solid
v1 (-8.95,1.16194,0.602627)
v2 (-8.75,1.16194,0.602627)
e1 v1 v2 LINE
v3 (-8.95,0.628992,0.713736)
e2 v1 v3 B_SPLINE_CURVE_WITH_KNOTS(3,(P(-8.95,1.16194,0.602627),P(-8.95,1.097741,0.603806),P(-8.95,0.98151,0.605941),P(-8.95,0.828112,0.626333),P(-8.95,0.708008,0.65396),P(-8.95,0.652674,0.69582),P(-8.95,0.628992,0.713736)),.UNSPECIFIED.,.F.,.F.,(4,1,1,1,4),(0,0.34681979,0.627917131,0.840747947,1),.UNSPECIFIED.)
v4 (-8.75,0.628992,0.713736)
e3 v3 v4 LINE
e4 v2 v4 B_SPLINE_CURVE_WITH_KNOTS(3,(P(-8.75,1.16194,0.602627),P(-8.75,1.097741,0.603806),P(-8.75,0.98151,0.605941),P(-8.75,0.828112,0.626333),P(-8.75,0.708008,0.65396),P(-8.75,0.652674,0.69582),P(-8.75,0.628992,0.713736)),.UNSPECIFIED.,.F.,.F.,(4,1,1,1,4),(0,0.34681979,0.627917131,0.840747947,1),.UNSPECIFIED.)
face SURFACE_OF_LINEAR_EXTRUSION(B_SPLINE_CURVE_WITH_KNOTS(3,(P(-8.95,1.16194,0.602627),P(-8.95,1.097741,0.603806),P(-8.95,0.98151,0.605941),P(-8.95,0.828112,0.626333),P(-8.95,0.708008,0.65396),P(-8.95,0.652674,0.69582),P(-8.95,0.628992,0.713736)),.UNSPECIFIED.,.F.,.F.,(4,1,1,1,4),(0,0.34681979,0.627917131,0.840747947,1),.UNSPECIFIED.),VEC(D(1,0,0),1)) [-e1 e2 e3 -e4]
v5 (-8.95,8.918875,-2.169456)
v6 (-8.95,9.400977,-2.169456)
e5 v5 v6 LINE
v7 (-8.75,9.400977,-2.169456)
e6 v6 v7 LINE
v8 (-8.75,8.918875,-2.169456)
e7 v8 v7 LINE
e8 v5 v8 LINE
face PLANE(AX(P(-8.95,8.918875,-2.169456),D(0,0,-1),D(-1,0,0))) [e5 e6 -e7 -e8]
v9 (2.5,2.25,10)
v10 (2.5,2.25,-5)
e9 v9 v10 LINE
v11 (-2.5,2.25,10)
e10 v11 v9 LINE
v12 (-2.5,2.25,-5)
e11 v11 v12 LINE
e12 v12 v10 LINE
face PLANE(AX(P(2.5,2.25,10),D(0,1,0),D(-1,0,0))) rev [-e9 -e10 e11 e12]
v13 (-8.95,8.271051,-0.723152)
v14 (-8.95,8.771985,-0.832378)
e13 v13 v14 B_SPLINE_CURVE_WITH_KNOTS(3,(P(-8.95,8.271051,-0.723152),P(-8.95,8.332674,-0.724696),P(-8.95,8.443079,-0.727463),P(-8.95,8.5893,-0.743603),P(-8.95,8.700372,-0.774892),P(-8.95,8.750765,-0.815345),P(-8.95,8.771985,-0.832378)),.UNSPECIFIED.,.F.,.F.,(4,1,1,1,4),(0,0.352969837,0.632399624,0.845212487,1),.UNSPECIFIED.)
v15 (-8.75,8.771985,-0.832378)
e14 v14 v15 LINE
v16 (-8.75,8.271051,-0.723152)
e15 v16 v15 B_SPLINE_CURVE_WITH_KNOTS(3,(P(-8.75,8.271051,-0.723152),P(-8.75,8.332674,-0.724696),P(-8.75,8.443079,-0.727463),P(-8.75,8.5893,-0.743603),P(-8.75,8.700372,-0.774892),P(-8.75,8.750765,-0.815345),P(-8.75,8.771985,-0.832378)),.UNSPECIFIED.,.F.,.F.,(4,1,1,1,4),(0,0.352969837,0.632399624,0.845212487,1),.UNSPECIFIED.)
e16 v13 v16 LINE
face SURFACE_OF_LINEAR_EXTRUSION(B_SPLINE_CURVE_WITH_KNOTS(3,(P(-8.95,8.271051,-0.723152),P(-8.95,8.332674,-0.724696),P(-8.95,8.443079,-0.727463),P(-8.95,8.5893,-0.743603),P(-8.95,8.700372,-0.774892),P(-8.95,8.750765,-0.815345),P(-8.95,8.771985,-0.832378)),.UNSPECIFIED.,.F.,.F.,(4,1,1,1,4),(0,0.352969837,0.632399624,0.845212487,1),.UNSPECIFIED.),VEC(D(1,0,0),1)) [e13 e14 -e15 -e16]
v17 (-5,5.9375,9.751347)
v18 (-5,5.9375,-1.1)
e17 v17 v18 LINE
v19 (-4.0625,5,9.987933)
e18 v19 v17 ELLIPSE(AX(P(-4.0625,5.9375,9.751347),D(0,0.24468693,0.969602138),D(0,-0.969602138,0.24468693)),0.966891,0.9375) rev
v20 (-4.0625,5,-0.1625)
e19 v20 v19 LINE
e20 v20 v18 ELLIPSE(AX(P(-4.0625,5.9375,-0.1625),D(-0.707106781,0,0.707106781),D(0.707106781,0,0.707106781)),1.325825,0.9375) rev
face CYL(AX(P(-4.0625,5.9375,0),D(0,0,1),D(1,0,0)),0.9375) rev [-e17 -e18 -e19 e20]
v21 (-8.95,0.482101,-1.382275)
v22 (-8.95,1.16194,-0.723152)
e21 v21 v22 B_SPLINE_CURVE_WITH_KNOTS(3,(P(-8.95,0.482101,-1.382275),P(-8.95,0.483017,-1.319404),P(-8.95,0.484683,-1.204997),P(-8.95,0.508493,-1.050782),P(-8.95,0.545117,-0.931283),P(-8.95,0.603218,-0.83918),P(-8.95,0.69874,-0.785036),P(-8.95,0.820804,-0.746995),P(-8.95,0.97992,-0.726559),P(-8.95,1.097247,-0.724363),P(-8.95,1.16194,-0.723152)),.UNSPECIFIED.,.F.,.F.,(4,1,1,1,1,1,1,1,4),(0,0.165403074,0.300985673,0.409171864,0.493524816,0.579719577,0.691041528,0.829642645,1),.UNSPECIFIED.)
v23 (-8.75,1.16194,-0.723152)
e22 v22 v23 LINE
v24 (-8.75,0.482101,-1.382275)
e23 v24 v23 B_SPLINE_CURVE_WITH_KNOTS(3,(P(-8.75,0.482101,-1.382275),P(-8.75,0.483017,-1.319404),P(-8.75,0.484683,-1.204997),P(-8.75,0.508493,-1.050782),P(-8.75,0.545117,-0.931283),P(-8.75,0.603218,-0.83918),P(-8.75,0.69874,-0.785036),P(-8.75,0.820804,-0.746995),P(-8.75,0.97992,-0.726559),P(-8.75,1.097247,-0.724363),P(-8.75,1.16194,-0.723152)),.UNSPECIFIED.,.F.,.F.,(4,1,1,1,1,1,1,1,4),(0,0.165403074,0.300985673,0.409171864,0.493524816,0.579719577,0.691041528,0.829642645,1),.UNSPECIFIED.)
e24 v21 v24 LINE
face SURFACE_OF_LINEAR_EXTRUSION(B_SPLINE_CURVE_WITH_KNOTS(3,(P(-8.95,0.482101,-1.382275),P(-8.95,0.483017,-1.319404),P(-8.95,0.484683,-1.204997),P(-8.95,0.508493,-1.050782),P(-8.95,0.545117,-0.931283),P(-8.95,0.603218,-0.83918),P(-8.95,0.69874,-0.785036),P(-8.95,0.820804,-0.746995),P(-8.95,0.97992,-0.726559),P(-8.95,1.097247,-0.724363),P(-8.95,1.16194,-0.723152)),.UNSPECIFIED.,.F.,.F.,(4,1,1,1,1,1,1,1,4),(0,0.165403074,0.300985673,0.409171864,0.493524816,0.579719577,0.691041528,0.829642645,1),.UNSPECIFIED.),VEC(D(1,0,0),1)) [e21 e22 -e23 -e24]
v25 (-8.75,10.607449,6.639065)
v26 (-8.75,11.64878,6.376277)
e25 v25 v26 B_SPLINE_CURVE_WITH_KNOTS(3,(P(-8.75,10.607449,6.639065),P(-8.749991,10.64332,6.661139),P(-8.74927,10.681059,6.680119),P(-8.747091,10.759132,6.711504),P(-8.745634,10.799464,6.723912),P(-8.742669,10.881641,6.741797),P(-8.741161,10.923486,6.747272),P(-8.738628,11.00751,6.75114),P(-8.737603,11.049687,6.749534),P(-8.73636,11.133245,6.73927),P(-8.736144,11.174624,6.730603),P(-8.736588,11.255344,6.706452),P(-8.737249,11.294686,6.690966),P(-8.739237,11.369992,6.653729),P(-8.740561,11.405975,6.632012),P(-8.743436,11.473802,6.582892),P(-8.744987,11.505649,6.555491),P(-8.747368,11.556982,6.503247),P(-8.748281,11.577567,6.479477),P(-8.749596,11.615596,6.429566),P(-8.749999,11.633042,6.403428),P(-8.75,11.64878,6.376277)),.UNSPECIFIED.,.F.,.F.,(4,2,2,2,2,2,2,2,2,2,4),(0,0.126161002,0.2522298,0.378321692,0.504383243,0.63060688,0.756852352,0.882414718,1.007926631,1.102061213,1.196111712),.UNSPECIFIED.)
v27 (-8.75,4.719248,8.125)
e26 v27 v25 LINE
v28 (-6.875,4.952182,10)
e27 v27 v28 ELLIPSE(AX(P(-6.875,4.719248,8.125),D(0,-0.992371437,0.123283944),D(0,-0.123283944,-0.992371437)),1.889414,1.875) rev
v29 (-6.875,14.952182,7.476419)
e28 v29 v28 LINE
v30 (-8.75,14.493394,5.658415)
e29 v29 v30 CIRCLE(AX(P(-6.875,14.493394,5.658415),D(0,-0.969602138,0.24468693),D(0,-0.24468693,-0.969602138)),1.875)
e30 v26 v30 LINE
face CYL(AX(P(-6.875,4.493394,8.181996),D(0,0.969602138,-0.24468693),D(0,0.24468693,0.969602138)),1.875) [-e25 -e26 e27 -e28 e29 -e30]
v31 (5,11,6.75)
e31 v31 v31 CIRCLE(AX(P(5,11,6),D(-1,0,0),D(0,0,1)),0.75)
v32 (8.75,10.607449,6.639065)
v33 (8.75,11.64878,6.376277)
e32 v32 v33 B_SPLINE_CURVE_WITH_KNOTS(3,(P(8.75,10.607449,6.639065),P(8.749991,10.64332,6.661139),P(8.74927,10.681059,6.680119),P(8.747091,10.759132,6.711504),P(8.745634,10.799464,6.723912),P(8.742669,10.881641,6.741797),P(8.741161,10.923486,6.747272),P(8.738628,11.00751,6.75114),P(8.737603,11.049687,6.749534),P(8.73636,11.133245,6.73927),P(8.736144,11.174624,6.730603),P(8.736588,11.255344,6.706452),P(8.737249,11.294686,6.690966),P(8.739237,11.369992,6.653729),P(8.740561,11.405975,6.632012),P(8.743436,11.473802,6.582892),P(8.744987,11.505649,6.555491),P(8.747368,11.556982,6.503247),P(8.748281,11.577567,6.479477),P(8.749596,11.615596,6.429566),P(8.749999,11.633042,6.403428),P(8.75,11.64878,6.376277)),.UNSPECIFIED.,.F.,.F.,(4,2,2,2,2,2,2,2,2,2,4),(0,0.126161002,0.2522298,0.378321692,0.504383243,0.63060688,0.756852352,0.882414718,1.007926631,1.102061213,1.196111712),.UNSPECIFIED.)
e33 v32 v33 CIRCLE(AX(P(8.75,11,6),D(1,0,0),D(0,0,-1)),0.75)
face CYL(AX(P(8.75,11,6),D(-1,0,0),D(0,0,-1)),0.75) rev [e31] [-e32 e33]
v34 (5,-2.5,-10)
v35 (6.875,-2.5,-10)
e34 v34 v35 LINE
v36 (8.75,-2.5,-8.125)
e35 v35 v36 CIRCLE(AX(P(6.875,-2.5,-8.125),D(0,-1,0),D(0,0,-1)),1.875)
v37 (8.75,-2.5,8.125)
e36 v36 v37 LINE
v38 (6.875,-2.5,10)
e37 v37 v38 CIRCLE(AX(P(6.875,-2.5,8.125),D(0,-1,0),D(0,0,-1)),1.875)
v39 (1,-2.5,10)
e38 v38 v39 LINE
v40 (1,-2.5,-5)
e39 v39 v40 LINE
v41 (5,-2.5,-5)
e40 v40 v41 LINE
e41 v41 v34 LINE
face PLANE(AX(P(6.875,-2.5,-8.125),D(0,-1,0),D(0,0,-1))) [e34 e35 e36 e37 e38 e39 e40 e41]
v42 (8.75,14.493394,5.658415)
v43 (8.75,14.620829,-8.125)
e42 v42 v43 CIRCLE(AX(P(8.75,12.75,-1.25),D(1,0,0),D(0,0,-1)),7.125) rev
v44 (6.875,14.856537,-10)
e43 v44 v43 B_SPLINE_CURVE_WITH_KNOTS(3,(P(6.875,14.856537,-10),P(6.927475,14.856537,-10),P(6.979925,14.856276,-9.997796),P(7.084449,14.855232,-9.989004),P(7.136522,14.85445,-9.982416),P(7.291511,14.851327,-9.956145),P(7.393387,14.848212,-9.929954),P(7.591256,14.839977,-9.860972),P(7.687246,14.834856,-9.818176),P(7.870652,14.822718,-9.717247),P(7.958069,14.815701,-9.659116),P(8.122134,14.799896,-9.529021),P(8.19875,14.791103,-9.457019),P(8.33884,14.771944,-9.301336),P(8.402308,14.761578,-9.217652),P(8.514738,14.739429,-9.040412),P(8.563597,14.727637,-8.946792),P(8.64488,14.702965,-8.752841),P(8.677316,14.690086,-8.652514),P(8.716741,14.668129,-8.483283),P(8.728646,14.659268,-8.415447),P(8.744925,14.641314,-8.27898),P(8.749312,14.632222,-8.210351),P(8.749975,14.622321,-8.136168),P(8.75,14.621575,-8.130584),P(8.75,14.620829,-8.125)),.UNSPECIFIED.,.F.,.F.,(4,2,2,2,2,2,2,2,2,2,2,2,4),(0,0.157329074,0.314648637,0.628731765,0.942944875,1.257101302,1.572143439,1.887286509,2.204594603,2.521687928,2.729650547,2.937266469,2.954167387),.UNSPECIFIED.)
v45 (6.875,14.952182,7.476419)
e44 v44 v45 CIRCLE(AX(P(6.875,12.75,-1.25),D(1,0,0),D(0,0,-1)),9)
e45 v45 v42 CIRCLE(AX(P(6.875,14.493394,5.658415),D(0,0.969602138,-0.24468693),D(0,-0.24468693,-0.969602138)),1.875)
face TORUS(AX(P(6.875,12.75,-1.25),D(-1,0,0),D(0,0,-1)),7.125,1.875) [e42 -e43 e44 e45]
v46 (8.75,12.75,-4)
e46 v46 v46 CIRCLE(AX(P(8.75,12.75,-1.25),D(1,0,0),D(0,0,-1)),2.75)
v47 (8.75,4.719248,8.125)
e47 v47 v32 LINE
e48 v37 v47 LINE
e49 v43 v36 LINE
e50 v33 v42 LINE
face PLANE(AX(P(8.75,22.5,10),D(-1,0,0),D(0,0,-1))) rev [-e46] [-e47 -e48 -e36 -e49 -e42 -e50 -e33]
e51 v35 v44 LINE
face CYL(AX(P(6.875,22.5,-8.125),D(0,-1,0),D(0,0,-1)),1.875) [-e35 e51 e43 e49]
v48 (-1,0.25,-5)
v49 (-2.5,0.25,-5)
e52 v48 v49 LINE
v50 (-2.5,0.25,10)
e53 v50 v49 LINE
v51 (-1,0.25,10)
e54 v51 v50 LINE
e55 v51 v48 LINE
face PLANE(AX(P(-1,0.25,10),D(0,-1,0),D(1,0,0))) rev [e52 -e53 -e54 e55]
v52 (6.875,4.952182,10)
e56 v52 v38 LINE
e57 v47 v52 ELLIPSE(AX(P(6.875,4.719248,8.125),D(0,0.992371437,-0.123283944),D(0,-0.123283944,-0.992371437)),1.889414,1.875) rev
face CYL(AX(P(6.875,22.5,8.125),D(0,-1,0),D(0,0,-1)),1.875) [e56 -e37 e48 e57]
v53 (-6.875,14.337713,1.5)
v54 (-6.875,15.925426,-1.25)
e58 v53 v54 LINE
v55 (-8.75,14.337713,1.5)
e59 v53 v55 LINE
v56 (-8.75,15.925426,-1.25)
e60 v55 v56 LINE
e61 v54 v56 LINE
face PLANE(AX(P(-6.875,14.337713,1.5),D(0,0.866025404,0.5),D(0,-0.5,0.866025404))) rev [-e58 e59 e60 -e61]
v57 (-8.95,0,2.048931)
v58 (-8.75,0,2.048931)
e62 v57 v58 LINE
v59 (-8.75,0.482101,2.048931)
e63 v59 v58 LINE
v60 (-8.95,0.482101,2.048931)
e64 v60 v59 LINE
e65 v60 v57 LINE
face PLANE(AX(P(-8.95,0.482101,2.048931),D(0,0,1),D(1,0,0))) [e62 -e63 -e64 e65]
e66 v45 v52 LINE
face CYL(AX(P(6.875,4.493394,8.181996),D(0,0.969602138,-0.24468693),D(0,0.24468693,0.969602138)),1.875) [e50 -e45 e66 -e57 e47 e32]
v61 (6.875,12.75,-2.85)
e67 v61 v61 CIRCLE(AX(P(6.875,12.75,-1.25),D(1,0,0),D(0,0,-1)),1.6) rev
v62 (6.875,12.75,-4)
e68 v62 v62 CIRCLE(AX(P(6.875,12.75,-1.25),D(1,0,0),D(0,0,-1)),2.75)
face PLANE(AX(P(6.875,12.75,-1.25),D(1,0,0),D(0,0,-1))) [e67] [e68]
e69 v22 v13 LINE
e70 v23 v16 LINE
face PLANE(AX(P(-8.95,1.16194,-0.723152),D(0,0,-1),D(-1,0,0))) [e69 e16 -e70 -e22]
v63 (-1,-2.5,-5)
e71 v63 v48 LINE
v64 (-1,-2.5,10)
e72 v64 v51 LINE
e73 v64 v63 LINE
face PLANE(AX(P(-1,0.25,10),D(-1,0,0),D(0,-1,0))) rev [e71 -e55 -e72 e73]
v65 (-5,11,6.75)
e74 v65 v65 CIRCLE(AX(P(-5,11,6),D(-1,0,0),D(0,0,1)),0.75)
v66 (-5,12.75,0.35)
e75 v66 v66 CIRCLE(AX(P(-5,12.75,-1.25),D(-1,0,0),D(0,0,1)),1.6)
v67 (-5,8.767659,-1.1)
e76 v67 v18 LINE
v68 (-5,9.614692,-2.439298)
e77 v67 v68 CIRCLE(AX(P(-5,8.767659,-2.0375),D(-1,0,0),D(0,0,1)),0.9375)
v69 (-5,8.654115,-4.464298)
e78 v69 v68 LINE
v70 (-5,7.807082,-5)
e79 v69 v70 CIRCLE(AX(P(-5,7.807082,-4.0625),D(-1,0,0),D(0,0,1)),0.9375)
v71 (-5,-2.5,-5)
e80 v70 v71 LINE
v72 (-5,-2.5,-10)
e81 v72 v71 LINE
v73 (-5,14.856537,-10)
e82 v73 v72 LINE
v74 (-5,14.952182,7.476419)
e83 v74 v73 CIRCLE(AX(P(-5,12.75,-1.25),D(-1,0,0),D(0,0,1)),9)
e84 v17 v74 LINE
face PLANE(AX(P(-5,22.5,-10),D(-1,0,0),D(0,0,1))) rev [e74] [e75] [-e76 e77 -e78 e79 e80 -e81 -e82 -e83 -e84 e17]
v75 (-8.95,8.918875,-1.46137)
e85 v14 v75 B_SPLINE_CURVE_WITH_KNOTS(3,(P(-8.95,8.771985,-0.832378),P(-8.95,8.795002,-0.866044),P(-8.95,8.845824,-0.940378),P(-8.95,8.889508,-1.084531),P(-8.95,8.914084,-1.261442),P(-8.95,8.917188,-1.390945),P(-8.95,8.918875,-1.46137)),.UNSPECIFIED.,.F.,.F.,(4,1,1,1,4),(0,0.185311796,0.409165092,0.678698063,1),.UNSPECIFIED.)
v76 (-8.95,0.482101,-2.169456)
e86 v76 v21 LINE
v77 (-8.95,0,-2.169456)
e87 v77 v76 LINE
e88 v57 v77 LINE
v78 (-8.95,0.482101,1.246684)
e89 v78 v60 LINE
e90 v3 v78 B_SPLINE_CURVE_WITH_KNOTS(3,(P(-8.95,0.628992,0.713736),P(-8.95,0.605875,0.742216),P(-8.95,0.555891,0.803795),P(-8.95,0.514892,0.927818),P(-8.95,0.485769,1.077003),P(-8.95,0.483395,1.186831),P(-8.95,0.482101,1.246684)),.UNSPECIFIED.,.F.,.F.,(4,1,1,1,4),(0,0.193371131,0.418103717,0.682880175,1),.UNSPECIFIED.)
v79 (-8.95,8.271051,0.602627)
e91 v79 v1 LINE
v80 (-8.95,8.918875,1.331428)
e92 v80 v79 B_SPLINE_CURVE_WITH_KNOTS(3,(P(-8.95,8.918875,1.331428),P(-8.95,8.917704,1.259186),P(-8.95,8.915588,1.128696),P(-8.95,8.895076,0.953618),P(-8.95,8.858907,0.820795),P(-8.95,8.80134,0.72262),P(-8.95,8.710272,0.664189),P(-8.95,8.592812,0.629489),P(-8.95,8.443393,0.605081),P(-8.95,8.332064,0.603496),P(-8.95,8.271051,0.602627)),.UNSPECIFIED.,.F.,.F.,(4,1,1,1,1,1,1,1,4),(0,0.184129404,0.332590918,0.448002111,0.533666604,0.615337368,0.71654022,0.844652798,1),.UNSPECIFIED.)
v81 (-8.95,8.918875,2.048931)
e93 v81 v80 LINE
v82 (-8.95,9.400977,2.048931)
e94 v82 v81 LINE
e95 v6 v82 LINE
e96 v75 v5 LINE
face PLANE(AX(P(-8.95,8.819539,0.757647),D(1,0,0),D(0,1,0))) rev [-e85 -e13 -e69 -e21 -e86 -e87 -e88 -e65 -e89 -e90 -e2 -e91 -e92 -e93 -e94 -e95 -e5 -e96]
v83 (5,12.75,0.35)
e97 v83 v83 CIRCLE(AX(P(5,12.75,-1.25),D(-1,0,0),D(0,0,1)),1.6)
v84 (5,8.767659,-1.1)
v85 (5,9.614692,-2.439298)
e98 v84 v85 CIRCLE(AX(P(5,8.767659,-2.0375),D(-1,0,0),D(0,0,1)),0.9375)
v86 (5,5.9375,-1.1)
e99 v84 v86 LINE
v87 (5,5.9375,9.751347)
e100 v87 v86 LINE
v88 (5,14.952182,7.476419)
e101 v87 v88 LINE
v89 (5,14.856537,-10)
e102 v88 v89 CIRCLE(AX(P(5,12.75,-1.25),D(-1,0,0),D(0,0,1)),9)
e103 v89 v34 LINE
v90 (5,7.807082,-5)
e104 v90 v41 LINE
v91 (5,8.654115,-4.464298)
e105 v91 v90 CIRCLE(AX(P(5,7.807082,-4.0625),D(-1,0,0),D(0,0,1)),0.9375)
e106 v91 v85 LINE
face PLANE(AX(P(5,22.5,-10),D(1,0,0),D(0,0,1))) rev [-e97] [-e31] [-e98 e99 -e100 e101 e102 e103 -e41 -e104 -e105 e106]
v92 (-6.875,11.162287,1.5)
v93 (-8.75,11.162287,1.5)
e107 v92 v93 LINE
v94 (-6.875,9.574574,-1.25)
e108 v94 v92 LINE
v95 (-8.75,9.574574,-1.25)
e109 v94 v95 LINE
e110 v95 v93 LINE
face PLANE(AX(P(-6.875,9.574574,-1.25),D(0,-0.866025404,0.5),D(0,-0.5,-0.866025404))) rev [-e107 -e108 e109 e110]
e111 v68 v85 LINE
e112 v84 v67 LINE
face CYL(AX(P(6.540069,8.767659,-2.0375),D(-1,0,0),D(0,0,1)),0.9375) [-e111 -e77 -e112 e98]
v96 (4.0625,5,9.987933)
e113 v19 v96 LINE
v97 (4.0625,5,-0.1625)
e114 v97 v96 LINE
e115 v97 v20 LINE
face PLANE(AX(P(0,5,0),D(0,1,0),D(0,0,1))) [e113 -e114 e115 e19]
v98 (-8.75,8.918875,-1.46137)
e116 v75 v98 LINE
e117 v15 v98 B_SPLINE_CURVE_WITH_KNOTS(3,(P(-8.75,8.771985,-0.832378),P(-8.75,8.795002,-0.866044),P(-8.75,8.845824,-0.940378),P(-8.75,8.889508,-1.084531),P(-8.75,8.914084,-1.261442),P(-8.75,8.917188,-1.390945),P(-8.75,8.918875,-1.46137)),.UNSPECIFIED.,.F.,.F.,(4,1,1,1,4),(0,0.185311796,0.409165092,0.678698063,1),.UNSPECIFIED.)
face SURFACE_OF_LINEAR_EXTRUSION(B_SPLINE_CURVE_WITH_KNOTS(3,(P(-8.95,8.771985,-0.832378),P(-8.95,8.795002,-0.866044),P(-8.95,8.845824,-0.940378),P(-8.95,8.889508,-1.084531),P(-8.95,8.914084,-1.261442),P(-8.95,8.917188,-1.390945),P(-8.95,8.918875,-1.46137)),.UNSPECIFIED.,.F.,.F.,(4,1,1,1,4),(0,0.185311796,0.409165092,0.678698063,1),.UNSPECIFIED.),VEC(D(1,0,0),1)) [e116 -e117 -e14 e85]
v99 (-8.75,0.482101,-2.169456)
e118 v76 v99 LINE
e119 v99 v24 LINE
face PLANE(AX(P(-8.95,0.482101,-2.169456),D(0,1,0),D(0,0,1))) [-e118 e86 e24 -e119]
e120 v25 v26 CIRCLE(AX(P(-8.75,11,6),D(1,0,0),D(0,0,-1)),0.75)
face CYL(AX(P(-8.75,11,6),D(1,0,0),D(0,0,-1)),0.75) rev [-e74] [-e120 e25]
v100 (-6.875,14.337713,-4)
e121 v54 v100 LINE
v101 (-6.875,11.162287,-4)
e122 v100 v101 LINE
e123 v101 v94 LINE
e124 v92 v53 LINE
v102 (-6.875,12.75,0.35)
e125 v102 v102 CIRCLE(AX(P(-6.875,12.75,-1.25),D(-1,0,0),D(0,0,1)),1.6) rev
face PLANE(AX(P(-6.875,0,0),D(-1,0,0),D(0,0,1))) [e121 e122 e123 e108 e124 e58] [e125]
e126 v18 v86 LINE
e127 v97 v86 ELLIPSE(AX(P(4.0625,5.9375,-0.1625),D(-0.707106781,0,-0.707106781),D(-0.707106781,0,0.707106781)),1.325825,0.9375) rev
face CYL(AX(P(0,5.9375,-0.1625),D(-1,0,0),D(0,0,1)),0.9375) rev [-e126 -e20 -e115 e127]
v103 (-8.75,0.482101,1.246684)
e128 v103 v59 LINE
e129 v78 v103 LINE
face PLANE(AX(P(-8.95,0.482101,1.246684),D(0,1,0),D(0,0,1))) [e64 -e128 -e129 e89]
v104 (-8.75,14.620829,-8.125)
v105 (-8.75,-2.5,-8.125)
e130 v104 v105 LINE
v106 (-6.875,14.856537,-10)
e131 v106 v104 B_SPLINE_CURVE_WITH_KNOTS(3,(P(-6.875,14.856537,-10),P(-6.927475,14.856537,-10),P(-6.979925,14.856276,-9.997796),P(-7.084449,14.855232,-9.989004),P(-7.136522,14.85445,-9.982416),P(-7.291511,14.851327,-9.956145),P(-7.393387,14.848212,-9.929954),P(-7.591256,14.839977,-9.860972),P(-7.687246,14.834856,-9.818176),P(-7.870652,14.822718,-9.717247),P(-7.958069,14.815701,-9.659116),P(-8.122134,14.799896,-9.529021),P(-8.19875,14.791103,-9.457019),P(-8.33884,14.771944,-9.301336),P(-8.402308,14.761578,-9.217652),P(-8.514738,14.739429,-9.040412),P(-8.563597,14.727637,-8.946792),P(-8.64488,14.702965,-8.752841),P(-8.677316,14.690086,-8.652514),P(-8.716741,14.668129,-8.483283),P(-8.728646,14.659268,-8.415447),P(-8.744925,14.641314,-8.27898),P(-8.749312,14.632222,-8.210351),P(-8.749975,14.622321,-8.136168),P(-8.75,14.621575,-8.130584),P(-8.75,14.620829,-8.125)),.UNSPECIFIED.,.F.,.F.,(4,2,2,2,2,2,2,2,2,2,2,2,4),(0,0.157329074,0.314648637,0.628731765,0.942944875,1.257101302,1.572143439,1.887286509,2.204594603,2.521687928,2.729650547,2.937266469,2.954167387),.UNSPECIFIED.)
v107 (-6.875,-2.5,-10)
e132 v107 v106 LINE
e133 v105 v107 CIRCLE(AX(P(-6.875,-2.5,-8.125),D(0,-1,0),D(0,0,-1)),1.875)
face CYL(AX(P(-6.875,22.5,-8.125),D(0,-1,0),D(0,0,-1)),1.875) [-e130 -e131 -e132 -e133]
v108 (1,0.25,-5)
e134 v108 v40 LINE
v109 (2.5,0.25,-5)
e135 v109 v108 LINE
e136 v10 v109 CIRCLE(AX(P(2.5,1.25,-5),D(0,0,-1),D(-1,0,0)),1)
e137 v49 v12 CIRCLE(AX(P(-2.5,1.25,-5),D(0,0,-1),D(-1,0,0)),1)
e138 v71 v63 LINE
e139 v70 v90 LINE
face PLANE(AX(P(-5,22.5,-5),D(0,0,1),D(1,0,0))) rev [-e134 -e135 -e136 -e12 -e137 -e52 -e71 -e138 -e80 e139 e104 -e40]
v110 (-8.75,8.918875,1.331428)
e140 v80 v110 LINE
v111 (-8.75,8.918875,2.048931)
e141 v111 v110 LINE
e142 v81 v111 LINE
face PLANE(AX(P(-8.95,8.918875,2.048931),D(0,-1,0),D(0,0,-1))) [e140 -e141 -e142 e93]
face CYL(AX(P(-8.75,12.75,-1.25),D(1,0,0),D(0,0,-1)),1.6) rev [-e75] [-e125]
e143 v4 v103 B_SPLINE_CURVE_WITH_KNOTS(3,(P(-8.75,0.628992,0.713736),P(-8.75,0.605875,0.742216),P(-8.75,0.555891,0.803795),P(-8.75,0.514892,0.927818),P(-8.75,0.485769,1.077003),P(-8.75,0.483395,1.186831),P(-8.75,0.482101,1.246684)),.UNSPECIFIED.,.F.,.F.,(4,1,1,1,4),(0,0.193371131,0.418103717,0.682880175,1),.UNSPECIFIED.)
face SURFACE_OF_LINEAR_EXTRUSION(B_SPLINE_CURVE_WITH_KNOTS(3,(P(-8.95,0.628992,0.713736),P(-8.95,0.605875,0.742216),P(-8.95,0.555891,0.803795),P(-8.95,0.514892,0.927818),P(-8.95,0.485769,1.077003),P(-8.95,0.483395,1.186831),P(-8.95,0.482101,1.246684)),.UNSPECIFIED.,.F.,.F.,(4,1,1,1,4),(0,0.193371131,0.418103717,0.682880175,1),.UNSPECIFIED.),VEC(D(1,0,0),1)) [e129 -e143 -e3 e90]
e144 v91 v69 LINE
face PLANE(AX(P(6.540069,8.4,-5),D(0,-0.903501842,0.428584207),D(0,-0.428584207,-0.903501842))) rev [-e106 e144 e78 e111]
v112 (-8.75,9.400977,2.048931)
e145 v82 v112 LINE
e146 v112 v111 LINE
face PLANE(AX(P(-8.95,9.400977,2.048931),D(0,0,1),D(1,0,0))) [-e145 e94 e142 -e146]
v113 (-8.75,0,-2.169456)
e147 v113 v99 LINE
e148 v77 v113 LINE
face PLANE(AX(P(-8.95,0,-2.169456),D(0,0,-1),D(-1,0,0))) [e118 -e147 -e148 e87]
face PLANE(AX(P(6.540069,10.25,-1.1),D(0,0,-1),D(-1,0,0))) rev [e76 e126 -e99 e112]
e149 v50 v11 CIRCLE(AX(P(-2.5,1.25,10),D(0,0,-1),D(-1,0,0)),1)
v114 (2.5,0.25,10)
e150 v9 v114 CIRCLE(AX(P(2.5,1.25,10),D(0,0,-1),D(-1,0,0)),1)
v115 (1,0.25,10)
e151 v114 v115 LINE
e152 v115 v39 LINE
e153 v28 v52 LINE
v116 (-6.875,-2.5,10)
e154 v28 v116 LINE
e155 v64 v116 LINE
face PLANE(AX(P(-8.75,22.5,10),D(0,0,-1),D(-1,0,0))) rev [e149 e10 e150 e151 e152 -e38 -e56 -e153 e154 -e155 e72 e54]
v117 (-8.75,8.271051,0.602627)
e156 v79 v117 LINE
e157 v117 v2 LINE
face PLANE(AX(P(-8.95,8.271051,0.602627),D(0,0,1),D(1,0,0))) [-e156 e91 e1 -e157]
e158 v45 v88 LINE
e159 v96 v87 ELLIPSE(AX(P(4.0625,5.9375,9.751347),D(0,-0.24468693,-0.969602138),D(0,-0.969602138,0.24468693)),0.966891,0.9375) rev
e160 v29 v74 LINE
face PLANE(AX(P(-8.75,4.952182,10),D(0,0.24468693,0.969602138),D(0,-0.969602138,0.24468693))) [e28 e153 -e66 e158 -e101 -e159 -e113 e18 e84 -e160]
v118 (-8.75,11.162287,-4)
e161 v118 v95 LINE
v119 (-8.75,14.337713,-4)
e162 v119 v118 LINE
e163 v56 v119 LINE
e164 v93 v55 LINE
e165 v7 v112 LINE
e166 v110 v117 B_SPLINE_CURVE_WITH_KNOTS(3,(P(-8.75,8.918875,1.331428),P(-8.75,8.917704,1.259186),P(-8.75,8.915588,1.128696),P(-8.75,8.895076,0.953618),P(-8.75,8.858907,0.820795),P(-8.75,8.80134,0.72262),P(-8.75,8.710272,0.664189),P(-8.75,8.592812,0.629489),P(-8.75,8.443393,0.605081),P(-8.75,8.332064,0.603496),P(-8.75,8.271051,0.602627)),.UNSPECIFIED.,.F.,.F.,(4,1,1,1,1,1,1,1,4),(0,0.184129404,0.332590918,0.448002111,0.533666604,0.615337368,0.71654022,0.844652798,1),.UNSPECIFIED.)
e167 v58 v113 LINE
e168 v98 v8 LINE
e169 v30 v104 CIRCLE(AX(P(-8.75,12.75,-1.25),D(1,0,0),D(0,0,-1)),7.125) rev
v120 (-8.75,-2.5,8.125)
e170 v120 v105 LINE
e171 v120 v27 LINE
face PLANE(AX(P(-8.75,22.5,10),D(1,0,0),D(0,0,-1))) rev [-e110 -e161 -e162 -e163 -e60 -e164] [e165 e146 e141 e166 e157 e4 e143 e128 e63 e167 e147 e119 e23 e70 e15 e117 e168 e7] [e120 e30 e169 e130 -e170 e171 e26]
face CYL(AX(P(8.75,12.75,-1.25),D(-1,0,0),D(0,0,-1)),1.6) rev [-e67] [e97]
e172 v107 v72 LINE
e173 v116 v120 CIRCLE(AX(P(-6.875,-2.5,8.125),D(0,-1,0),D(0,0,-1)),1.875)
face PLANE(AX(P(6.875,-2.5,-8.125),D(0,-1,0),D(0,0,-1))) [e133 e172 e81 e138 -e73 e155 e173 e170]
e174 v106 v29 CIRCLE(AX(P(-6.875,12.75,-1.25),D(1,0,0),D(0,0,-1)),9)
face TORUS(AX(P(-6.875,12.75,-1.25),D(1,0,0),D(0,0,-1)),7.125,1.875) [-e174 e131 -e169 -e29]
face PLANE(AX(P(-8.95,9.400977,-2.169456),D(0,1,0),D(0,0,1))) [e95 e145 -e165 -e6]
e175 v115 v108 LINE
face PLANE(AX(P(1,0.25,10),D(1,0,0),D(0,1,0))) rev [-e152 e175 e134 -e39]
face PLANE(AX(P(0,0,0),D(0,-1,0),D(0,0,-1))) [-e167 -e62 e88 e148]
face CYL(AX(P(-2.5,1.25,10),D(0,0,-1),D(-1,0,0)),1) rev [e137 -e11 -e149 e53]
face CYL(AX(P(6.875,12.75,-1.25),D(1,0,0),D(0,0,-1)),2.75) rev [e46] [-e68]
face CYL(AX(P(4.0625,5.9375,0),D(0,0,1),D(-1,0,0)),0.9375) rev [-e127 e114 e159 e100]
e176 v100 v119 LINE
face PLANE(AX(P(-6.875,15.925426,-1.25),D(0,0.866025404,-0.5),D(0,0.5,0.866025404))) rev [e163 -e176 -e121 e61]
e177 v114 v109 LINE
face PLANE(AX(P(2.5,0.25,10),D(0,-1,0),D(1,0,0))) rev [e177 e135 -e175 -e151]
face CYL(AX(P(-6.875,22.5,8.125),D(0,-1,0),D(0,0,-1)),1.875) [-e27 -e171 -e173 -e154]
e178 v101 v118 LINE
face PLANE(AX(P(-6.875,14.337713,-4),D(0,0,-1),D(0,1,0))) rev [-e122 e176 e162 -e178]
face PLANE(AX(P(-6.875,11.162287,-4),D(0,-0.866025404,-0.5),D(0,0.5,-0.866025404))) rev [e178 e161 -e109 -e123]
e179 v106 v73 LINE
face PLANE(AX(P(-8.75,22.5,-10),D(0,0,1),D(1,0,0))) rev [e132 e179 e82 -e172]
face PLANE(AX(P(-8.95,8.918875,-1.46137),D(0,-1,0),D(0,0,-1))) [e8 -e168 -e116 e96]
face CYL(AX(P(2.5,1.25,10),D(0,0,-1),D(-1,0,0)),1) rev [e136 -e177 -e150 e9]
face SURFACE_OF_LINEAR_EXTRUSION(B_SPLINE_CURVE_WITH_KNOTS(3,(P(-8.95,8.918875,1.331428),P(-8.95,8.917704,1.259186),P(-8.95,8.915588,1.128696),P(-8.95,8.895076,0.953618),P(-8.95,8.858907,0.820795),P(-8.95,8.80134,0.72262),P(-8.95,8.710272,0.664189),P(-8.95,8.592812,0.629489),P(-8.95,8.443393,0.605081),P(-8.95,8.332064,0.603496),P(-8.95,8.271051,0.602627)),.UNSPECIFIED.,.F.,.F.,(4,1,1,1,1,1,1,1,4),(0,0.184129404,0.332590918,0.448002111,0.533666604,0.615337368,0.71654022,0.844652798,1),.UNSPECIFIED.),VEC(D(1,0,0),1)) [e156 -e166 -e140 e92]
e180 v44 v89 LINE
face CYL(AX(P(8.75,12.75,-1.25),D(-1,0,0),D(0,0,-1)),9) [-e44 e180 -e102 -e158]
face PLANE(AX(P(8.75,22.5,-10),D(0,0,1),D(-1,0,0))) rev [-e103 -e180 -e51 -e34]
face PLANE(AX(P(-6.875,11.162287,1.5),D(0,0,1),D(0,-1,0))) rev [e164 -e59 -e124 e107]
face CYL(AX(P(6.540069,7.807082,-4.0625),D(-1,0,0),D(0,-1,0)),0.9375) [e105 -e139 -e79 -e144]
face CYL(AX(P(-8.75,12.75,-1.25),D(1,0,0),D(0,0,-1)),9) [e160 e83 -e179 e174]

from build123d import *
from build123d.topology import SkipClean

# Parameters (mm, degrees)
BOSS_EXTRUDE1_DEPTH = 22.5
SKETCH3_W           = 10
SKETCH3_H           = 20
CUT_EXTRUDE1_DEPTH  = 17.5
SKETCH4_OUTSIDE_W   = 28.964
SKETCH4_OUTSIDE_H   = 31.464
SKETCH4_OUTSIDE_R   = 1.6
SKETCH4_OUTSIDE_R_2 = 0.75
CUT_EXTRUDE2_DEPTH  = 31.207614934
FILLET1_R           = 1.875
SKETCH7_W           = 20
SKETCH7_H           = 25
CUT_EXTRUDE4_DEPTH  = 8.75
BOSS_EXTRUDE3_DEPTH = 5
FILLET2_R           = 0.9375
SKETCH11_R          = 2.75
CUT_EXTRUDE6_DEPTH  = 1.875
CUT_EXTRUDE7_DEPTH  = 1.875
BOSS_EXTRUDE4_DEPTH = 0.2
BOSS_EXTRUDE9_START = 2.5
BOSS_EXTRUDE9_DEPTH = 2.5
CUT_EXTRUDE8_DEPTH  = 28.895609137


with BuildPart() as part:
    # Sketch2 → Boss-Extrude1 (new body)
    with BuildSketch(Plane(origin=(0, 0, 0), x_dir=(1, 0, 0), z_dir=(0, 1, 0))):
        Polygon((5, 10), (8.75, 10), (8.75, -10), (-8.75, -10), (-8.75, 10), (-5, 10), (-5, 5), (5, 5), align=None)
    extrude(amount=BOSS_EXTRUDE1_DEPTH)

    # Sketch3 → Cut-Extrude1 (cut)
    with BuildSketch(Plane(origin=(0, 22.5, 0), x_dir=(1, 0, 0), z_dir=(0, 1, 0))):
        Rectangle(SKETCH3_W, SKETCH3_H)
    extrude(amount=-CUT_EXTRUDE1_DEPTH, mode=Mode.SUBTRACT)

    # Sketch4 outside → Cut-Extrude2 (cut, through all)
    # profile 1 of 3: a face of its own
    with BuildSketch(Plane(origin=(8.75, 0, 0), x_dir=(0, 0, -1), z_dir=(1, 0, 0))):
        with Locations((0, 11.25)):
            Rectangle(SKETCH4_OUTSIDE_W, SKETCH4_OUTSIDE_H)
        with BuildLine():
            Line((10, 14.856537443), (10, 0))
            Line((10, 0), (-10, 0))
            Line((-10, 0), (-10, 4.952182367))
            Line((-10, 4.952182367), (-7.476419244, 14.952182367))
            ThreePointArc((-7.476419244, 14.952182367), (1.29925445, 21.749865221), (10, 14.856537443))
        make_face(mode=Mode.SUBTRACT)
    # profile 2 of 3: a face of its own
    with BuildSketch(Plane(origin=(8.75, 0, 0), x_dir=(0, 0, -1), z_dir=(1, 0, 0))):
        with Locations((1.25, 12.75)):
            Circle(SKETCH4_OUTSIDE_R)
    # profile 3 of 3: a face of its own
    with BuildSketch(Plane(origin=(8.75, 0, 0), x_dir=(0, 0, -1), z_dir=(1, 0, 0))):
        with Locations((-6, 11)):
            Circle(SKETCH4_OUTSIDE_R_2)
    extrude(amount=-CUT_EXTRUDE2_DEPTH, mode=Mode.SUBTRACT)

    # Fillet1
    # the kernel refuses this fillet: 1.875 mm, written as the material it takes off along each edge
    with BuildSketch(Plane(origin=(-8.75, -1.875, 10), x_dir=(1, 0, 0), z_dir=(0, 1, 0)), Plane(origin=(8.75, -1.875, 10), x_dir=(0, 0, -1), z_dir=(0, 1, 0))) as fillet1_piece_1:
        with BuildLine():
            CenterArc((FILLET1_R, FILLET1_R), FILLET1_R, 180, 90)
            Line((0, FILLET1_R), (-FILLET1_R * 0.02, FILLET1_R))
            Line((-FILLET1_R * 0.02, FILLET1_R), (-FILLET1_R * 0.02, -FILLET1_R * 0.02))
            Line((-FILLET1_R * 0.02, -FILLET1_R * 0.02), (FILLET1_R, -FILLET1_R * 0.02))
            Line((FILLET1_R, -FILLET1_R * 0.02), (FILLET1_R, 0))
        make_face()
    extrude(amount=8.702182367, mode=Mode.SUBTRACT)
    with BuildSketch(Plane(origin=(-8.75, -1.875, -10), x_dir=(0, 0, 1), z_dir=(0, 1, 0)), Plane(origin=(8.75, -1.875, -10), x_dir=(-1, 0, 0), z_dir=(0, 1, 0))) as fillet1_piece_2:
        with BuildLine():
            CenterArc((FILLET1_R, FILLET1_R), FILLET1_R, 180, 90)
            Line((0, FILLET1_R), (-FILLET1_R * 0.02, FILLET1_R))
            Line((-FILLET1_R * 0.02, FILLET1_R), (-FILLET1_R * 0.02, -FILLET1_R * 0.02))
            Line((-FILLET1_R * 0.02, -FILLET1_R * 0.02), (FILLET1_R, -FILLET1_R * 0.02))
            Line((FILLET1_R, -FILLET1_R * 0.02), (FILLET1_R, 0))
        make_face()
    extrude(amount=18.606537443, mode=Mode.SUBTRACT)
    with BuildSketch(Plane(origin=(8.75, 12.75, -1.25), x_dir=(0, 0.2446869297035112, 0.9696021382156028), z_dir=(0, -0.9696021382156028, 0.2446869297035112))) as fillet1_piece_3:
        with BuildLine():
            CenterArc((9 - FILLET1_R, FILLET1_R), FILLET1_R, 270, 90)
            Line((9, FILLET1_R), (9 + FILLET1_R * 0.02, FILLET1_R))
            Line((9 + FILLET1_R * 0.02, FILLET1_R), (9 + FILLET1_R * 0.02, -FILLET1_R * 0.02))
            Line((9 + FILLET1_R * 0.02, -FILLET1_R * 0.02), (9 - FILLET1_R, -FILLET1_R * 0.02))
            Line((9 - FILLET1_R, -FILLET1_R * 0.02), (9 - FILLET1_R, 0))
        make_face()
    revolve(axis=Axis((8.75, 12.75, -1.25), (-1, 0, 0)), revolution_arc=164.250823416, mode=Mode.SUBTRACT)
    with BuildSketch(Plane(origin=(-8.75, 12.75, -1.25), x_dir=(0, 0.027674657987308005, -0.9996169833017472), z_dir=(0, -0.9996169833017472, -0.027674657987308005))) as fillet1_piece_4:
        with BuildLine():
            CenterArc((9 - FILLET1_R, FILLET1_R), FILLET1_R, 270, 90)
            Line((9, FILLET1_R), (9 + FILLET1_R * 0.02, FILLET1_R))
            Line((9 + FILLET1_R * 0.02, FILLET1_R), (9 + FILLET1_R * 0.02, -FILLET1_R * 0.02))
            Line((9 + FILLET1_R * 0.02, -FILLET1_R * 0.02), (9 - FILLET1_R, -FILLET1_R * 0.02))
            Line((9 - FILLET1_R, -FILLET1_R * 0.02), (9 - FILLET1_R, 0))
        make_face()
    revolve(axis=Axis((-8.75, 12.75, -1.25), (1, 0, 0)), revolution_arc=164.250823416, mode=Mode.SUBTRACT)
    with BuildSketch(Plane(origin=(-8.75, 14.952182367, 7.476419244), x_dir=(0, -0.2446869297035113, -0.9696021382156028), z_dir=(0, -0.9696021382156028, 0.24468692970351133)), Plane(origin=(8.75, 3.134178358, 10.458787993), x_dir=(0, -0.24468692970351133, -0.9696021382156028), z_dir=(0, 0.9696021382156028, -0.24468692970351133))) as fillet1_piece_5:
        with BuildLine():
            CenterArc((FILLET1_R, FILLET1_R), FILLET1_R, 180, 90)
            Line((0, FILLET1_R), (-FILLET1_R * 0.02, FILLET1_R))
            Line((-FILLET1_R * 0.02, FILLET1_R), (-FILLET1_R * 0.02, -FILLET1_R * 0.02))
            Line((-FILLET1_R * 0.02, -FILLET1_R * 0.02), (FILLET1_R, -FILLET1_R * 0.02))
            Line((FILLET1_R, -FILLET1_R * 0.02), (FILLET1_R, 0))
        make_face()
    extrude(amount=12.188508609, mode=Mode.SUBTRACT)

    # Sketch7 → Cut-Extrude4 (cut)
    with BuildSketch(Plane(origin=(8.75, 0, 0), x_dir=(0, 0, -1), z_dir=(1, 0, 0))):
        with Locations((0, 12.5)):
            Rectangle(SKETCH7_W, SKETCH7_H)
    extrude(amount=-CUT_EXTRUDE4_DEPTH, mode=Mode.SUBTRACT)

    # Sketch8 → Boss-Extrude3 (add)
    with BuildSketch(Plane(origin=(-5, 0, 0), x_dir=(0, 0, -1), z_dir=(1, 0, 0))):
        Polygon((5, 5), (5, 8.4), (1.1, 10.25), (1.1, 5), align=None)
    extrude(amount=BOSS_EXTRUDE3_DEPTH)

    # Fillet2
    fillet2_edges = [part.edges().sort_by_distance(p)[0] for p in [
        (-5, 5, 4.443966417),
        (-2.5, 10.25, -1.1),
        (-2.5, 8.4, -5),
        (-2.5, 5, -1.1),
    ]]
    fillet(fillet2_edges, radius=FILLET2_R)

    # Mirror2: part across plane


with BuildPart() as part_1:
    add(part.part)
    add(part.part.mirror(Plane.ZY))

    # Sketch11 → Cut-Extrude6 (cut)
    with BuildSketch(Plane(origin=(8.75, 0, 0), x_dir=(0, 0, -1), z_dir=(1, 0, 0))):
        with Locations((1.25, 12.75)):
            Circle(SKETCH11_R)
    extrude(amount=-CUT_EXTRUDE6_DEPTH, mode=Mode.SUBTRACT)

    # Sketch12 → Cut-Extrude7 (cut)
    with BuildSketch(Plane.ZY.offset(8.75)):
        Polygon((-1.25, 15.925426481), (-4, 14.33771324), (-4, 11.16228676), (-1.25, 9.574573519), (1.5, 11.16228676), (1.5, 14.33771324), align=None)
    extrude(amount=-CUT_EXTRUDE7_DEPTH, mode=Mode.SUBTRACT)

    # Sketch13 → Boss-Extrude4 (add)
    with BuildSketch(Plane.ZY.offset(8.75)):
        with BuildLine():
            Line((-2.16945613, 9.400976563), (2.048930789, 9.400976563))
            Line((2.048930789, 9.400976563), (2.048930789, 8.9188752))
            Line((2.048930789, 8.9188752), (1.331428371, 8.9188752))
            add(Edge.make_bspline(
                [(1.331428371, 8.9188752), (1.259186082, 8.917703873), (1.128695628, 8.915588118), (0.953618084, 8.895075924), (0.820795157, 8.85890692), (0.722620482, 8.801340017), (0.66418865, 8.710271847), (0.629489236, 8.592812055), (0.605081268, 8.443393165), (0.603495672, 8.332064189), (0.602626703, 8.271051495)],
                knots=[0, 0, 0, 0, 1.473035235, 2.660727346, 3.584016889, 4.269332832, 4.922698946, 5.732321762, 6.757222385, 8, 8, 8, 8], degree=3))
            Line((0.602626703, 8.271051495), (0.602626703, 1.161939611))
            add(Edge.make_bspline(
                [(0.602626703, 1.161939611), (0.603806075, 1.097741152), (0.605941327, 0.981509859), (0.626332927, 0.828112382), (0.653959528, 0.708007797), (0.695819757, 0.652674401), (0.713736001, 0.628991621)],
                knots=[0, 0, 0, 0, 1.387279159, 2.511668523, 3.362991788, 4, 4, 4, 4], degree=3))
            add(Edge.make_bspline(
                [(0.713736001, 0.628991621), (0.742216021, 0.605874577), (0.803795028, 0.555891305), (0.927817777, 0.514891851), (1.077003332, 0.485769381), (1.186830669, 0.483395223), (1.246683991, 0.482101362)],
                knots=[0, 0, 0, 0, 0.773484526, 1.672414867, 2.731520698, 4, 4, 4, 4], degree=3))
            Line((1.246683991, 0.482101362), (2.048930789, 0.482101362))
            Line((2.048930789, 0.482101362), (2.048930789, 0))
            Line((2.048930789, 0), (-2.16945613, 0))
            Line((-2.16945613, 0), (-2.16945613, 0.482101362))
            Line((-2.16945613, 0.482101362), (-1.382274999, 0.482101362))
            add(Edge.make_bspline(
                [(-1.382274999, 0.482101362), (-1.31940414, 0.48301697), (-1.204997391, 0.484683112), (-1.050781582, 0.508492708), (-0.931283172, 0.545116887), (-0.839180191, 0.603218278), (-0.785035731, 0.698739607), (-0.746995159, 0.820804221), (-0.726559461, 0.979920139), (-0.7243631, 1.097246659), (-0.723152043, 1.161939611)],
                knots=[0, 0, 0, 0, 1.323224596, 2.407885381, 3.273374914, 3.948198526, 4.637756618, 5.528332226, 6.637141158, 8, 8, 8, 8], degree=3))
            Line((-0.723152043, 1.161939611), (-0.723152043, 8.271051495))
            add(Edge.make_bspline(
                [(-0.723152043, 8.271051495), (-0.724696232, 8.332673526), (-0.727462884, 8.443078849), (-0.743603421, 8.589300261), (-0.77489184, 8.700371502), (-0.815344506, 8.750765334), (-0.832378133, 8.771984942)],
                knots=[0, 0, 0, 0, 1.411879347, 2.529598496, 3.380849948, 4, 4, 4, 4], degree=3))
            add(Edge.make_bspline(
                [(-0.832378133, 8.771984942), (-0.866044035, 8.795002172), (-0.940377737, 8.845823799), (-1.084531483, 8.88950754), (-1.261441827, 8.914084364), (-1.390944762, 8.917187619), (-1.461369754, 8.9188752)],
                knots=[0, 0, 0, 0, 0.741247183, 1.636660366, 2.714792252, 4, 4, 4, 4], degree=3))
            Line((-1.461369754, 8.9188752), (-2.16945613, 8.9188752))
            Line((-2.16945613, 8.9188752), (-2.16945613, 9.400976563))
        make_face()
    extrude(amount=BOSS_EXTRUDE4_DEPTH)

    # Sketch19 → Boss-Extrude9 (add)
    with SkipClean():  # the faces are left unmerged after this step: merging them gives an invalid solid
        with BuildSketch(Plane.XZ.offset(BOSS_EXTRUDE9_START)):
            with BuildLine():
                Line((-8.75, 2.048930789), (-8.75, -2.16945613))
                Line((-8.75, -2.16945613), (-8.75, -8.125))
                ThreePointArc((-8.75, -8.125), (-8.200825215, -9.450825215), (-6.875, -10))
                Line((-6.875, -10), (-5, -10))
                Line((-5, -10), (-5, -5))
                Line((-5, -5), (5, -5))
                Line((5, -5), (5, -10))
                Line((5, -10), (6.875, -10))
                ThreePointArc((6.875, -10), (8.200825215, -9.450825215), (8.75, -8.125))
                Line((8.75, -8.125), (8.75, 8.125))
                ThreePointArc((8.75, 8.125), (8.200825215, 9.450825215), (6.875, 10))
                Line((6.875, 10), (-6.875, 10))
                ThreePointArc((-6.875, 10), (-8.200825215, 9.450825215), (-8.75, 8.125))
                Line((-8.75, 8.125), (-8.75, 2.048930789))
            make_face()
        extrude(amount=-BOSS_EXTRUDE9_DEPTH)

    # Sketch20 → Cut-Extrude8 (cut, through all)
    with SkipClean():  # the faces are left unmerged after this step: merging them gives an invalid solid
        with BuildSketch(Plane(origin=(0, 0, -5), x_dir=(-1, 0, 0), z_dir=(0, 0, -1))):
            with BuildLine():
                Line((1, 0.25), (2.5, 0.25))
                ThreePointArc((2.5, 0.25), (3.5, 1.25), (2.5, 2.25))
                Line((2.5, 2.25), (-2.5, 2.25))
                ThreePointArc((-2.5, 2.25), (-3.5, 1.25), (-2.5, 0.25))
                Line((-2.5, 0.25), (-1, 0.25))
                Line((-1, 0.25), (-1, -2.5))
                ThreePointArc((-1, -2.5), (0, -3.5), (1, -2.5))
                Line((1, -2.5), (1, 0.25))
            make_face()
        extrude(amount=-CUT_EXTRUDE8_DEPTH, mode=Mode.SUBTRACT)


solid = part_1.part
